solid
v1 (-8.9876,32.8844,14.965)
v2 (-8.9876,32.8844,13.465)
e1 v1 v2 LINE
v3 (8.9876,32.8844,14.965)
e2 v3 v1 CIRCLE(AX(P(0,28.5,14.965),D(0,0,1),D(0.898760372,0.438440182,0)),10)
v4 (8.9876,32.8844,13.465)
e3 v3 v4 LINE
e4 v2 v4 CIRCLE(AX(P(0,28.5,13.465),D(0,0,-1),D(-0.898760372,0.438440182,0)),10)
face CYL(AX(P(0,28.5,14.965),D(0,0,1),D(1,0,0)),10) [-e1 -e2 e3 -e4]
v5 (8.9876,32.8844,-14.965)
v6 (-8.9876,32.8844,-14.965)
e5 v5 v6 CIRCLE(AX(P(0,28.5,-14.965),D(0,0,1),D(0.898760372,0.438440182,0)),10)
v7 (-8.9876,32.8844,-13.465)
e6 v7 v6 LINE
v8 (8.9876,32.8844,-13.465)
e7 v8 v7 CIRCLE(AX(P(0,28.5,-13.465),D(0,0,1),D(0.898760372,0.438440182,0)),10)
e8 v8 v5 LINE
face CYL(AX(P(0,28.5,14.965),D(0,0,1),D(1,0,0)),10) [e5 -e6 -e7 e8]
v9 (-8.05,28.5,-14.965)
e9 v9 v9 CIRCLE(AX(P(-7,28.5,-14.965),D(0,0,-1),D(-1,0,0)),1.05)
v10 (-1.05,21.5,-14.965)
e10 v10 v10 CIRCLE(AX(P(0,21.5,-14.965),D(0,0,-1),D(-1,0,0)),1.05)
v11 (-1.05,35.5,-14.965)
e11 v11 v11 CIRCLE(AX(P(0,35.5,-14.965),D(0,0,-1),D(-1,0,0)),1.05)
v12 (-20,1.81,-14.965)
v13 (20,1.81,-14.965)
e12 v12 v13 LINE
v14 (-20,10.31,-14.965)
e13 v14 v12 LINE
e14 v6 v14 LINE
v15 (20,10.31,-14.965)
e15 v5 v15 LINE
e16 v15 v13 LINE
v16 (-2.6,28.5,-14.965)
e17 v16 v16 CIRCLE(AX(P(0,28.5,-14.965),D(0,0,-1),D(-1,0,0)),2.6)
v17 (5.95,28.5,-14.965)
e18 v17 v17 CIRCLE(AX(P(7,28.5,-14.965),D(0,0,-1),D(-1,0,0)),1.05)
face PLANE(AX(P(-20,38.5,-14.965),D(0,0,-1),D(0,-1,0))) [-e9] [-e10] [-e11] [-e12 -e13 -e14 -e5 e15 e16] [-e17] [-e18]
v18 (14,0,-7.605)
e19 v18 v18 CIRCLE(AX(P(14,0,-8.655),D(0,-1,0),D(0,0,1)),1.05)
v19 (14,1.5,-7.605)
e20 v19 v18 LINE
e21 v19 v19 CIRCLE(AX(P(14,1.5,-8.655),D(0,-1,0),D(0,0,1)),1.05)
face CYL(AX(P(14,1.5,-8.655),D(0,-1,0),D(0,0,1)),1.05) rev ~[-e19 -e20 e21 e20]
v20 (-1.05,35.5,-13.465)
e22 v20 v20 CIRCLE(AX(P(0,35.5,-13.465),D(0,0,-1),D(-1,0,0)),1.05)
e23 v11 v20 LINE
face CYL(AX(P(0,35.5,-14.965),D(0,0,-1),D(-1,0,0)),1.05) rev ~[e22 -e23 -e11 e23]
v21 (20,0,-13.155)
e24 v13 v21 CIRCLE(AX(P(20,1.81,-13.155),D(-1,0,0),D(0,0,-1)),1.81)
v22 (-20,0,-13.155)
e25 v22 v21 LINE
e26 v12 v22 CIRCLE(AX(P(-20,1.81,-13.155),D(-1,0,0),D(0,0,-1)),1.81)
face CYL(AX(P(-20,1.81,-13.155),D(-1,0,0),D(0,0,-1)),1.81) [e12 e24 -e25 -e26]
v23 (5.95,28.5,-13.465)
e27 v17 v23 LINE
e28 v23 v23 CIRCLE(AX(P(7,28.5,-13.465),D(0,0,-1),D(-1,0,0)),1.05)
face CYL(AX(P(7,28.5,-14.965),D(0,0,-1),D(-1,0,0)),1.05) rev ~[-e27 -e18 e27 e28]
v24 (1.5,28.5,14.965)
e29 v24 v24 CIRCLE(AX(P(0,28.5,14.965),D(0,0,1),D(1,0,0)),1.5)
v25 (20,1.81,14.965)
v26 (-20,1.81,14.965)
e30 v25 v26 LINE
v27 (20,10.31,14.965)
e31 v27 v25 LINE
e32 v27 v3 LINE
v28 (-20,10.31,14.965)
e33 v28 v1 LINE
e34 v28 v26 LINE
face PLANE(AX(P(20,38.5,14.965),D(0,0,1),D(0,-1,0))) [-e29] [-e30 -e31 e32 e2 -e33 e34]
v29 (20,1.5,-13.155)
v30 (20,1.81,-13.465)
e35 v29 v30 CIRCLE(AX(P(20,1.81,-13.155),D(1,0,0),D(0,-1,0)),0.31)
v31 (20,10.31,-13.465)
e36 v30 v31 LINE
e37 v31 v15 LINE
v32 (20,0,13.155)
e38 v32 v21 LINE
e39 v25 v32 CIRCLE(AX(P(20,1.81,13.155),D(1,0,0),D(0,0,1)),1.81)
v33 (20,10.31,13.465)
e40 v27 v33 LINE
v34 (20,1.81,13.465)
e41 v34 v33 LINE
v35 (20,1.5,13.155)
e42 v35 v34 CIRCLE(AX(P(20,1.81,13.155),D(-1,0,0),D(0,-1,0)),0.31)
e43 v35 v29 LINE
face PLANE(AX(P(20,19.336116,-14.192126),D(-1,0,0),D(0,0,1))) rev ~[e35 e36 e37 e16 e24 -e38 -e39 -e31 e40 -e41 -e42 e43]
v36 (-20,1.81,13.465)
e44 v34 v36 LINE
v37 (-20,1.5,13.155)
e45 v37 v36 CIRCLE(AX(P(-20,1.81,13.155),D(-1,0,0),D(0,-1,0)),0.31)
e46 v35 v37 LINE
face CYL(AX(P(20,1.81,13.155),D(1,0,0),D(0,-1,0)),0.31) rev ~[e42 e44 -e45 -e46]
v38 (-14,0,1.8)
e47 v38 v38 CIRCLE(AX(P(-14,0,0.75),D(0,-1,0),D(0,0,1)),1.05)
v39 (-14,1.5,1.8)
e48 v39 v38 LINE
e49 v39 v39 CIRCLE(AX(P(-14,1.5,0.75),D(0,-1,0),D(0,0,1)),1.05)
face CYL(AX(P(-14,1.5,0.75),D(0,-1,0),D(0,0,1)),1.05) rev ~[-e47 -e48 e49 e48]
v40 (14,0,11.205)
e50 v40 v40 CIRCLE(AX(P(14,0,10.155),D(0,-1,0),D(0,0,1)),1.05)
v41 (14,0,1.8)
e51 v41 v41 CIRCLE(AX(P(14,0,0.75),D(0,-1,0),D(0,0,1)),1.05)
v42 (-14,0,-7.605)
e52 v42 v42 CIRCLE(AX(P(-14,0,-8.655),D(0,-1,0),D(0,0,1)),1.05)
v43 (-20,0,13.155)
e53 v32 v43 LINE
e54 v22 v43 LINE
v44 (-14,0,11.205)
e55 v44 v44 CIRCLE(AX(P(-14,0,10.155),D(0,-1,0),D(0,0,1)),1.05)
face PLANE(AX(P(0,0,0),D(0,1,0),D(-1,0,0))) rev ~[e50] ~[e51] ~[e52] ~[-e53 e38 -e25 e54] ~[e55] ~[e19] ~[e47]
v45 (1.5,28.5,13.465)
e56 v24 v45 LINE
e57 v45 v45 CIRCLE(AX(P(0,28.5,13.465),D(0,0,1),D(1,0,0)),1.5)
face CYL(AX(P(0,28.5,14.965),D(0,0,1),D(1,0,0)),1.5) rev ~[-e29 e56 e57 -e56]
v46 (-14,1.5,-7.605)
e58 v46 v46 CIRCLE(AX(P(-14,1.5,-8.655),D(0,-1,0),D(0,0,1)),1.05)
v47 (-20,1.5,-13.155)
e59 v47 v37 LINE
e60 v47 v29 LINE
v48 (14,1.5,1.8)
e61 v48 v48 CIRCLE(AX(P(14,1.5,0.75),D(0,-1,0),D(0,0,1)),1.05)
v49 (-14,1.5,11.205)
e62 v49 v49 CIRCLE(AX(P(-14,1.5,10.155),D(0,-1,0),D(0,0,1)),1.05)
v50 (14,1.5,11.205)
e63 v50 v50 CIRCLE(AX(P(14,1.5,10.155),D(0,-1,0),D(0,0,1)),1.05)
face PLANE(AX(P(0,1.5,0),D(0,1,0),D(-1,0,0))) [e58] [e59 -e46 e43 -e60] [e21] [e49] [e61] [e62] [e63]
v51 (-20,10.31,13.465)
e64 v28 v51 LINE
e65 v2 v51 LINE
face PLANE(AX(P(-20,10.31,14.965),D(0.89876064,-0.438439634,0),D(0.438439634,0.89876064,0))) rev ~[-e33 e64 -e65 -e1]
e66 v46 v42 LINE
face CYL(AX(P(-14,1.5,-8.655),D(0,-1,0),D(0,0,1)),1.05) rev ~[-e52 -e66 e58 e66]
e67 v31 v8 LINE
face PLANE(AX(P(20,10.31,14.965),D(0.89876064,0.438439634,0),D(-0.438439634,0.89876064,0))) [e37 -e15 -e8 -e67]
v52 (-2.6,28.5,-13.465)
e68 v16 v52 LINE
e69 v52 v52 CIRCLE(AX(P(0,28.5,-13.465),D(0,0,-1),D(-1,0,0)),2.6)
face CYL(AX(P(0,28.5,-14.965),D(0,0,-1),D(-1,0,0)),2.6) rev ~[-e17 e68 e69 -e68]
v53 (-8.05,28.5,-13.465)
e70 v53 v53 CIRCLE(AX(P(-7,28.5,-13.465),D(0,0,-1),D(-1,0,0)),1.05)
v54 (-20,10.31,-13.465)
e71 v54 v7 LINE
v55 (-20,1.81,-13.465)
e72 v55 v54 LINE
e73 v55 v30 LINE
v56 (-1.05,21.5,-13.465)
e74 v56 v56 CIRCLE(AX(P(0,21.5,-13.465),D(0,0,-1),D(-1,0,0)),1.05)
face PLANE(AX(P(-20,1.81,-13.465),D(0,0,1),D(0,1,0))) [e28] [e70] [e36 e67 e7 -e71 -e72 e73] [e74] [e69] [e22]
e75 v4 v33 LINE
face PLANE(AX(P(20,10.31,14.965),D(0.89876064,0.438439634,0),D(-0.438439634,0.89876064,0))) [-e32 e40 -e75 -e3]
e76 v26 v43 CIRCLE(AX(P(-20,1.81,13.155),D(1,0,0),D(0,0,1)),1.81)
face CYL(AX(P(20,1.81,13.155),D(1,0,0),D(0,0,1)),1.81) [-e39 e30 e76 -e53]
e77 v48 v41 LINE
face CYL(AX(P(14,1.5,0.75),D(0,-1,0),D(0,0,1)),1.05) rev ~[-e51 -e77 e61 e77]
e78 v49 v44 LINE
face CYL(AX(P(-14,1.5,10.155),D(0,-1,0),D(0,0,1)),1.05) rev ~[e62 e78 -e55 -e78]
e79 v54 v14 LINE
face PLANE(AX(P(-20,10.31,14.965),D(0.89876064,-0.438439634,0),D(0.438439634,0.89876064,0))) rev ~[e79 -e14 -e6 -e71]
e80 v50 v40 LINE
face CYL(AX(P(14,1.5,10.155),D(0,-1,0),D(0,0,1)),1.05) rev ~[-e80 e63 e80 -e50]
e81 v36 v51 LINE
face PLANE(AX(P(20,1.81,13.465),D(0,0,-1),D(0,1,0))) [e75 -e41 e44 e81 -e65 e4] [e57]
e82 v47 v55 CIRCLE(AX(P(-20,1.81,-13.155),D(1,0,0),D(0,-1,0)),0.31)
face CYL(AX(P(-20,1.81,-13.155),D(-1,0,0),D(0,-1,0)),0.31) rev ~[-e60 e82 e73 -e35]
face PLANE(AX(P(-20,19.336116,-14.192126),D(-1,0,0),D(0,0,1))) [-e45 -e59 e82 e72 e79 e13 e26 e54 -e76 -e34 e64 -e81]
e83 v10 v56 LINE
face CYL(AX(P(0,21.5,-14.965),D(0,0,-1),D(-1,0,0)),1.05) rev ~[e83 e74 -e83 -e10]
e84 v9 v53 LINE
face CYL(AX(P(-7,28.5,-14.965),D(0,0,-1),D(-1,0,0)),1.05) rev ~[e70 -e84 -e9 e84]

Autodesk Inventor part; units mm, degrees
ref_plane "YZ Plane" through (0, 0, 0) normal (1, 0, 0) x (0, 1, 0)
ref_plane "XZ Plane" through (0, 0, 0) normal (0, 1, 0) x (-1, 0, 0)
ref_plane "XY Plane" through (0, 0, 0) normal (0, 0, 1) x (1, 0, 0)
sketch "Sketch1" plane through (0, 0, 0) normal (0, 1, 0) x (-1, 0, 0)
  line L0 (20, 14.965) -> (-20, 14.965)
  line L1 (-20, 14.965) -> (-20, -14.965)
  line L2 (-20, -14.965) -> (20, -14.965)
  line L3 (20, -14.965) -> (20, 14.965)
  point P0 (0, 0)
  dimension "d0" = 29.93
  dimension "d1" = 40
  dimension "d2" = 20
  dimension "d3" = 14.965
extrude "Plate1" add sketch "Sketch1" along normal blind 1.5
sketch "Sketch2" plane through (-20, 0, -13.465) normal (0, 0, -1) x (-1, 0, 0)
  line L0 (-40, 0) -> (0, 0)
  line L1 (0, 0) -> (0, 38.5)
  line L2 (0, 38.5) -> (-40, 38.5)
  line L3 (-40, 38.5) -> (-40, 0)
edge flange "Flange1" height 38.5 angle 90 thickness 1.5 bend radius 0.31 thickness toward (0, 0, -1) relief tear relief width 1.5 relief depth 0.75 corner gap 0.31 corner form 0 edges at (0, 1.5, -14.965) (0, 1.5, 14.965) wall of the first edge with corners at (20, 0, -13.465) (-20, 0, -13.465) (-20, 38.5, -13.465) (20, 38.5, -13.465)
bend "Bend1"
corner "Corner1"
sketch "Sketch3" plane through (-20, 38.5, 14.965) normal (0, 0, 1) x (1, 0, 0)
  line L0 (0, 0) -> (40, 0) projected
  line L1 (0, -36.69) -> (0, 0) projected
  circle A0 centre (20, -10) radius 10
  line L2 (0, -28.19) -> (40, -28.19)
  line L3 (40, -28.19) -> (40, -38.19)
  line L4 (40, -38.19) -> (0, -38.19)
  line L5 (0, -38.19) -> (0, -28.19)
  line L6 (40, -28.19) -> (28.9876, -5.6156)
  line L7 (0, -28.19) -> (11.0124, -5.6156)
  line L8 (0, 0) -> (40, 0)
  line L9 (40, 0) -> (40, -35)
  line L10 (40, -35) -> (0, -35)
  line L11 (0, -35) -> (0, 0)
  point P0 (20, -38.5)
  point P1 (20, 0)
  point P2 (0, -28.19)
  point P3 (0, -35)
  point P4 (30, -10)
  dimension "d15" = 10
  dimension "d16" = 0
  dimension "d17" = 20
  dimension "d18" = 18.19
  dimension "d19" = 0
  dimension "d20" = 40
  dimension "d21" = 10
  dimension "d22" = 35
extrude "Extrusion1" cut sketch "Sketch3" against normal blind 35 contours L0 A0 L7 L1 | L0 L9 L6 A0
sketch "Sketch4" plane through (20, 1.81, -14.965) normal (0, 0, -1) x (-1, 0, 0)
  arc A0 (28.9876, 31.0744) -> (11.0124, 31.0744) centre (20, 26.69) ccw projected
  circle A1 centre (20, 26.69) radius 2.6
  circle A2 centre (13, 26.69) radius 1.05
  circle A3 centre (27, 26.69) radius 1.05
  circle A4 centre (20, 33.69) radius 1.05
  circle A5 centre (20, 19.69) radius 1.05
  point P0 (20, -1.81)
  dimension "d25" = 5.2
  dimension "d26" = 0
  dimension "d27" = 7
  dimension "d28" = 2.1
  dimension "d29" = 7
  dimension "d30" = 0
  dimension "d31" = 2.1
  dimension "d32" = 0
  dimension "d33" = 7
  dimension "d34" = 2.1
  dimension "d35" = 7
  dimension "d36" = 0
  dimension "d37" = 2.1
extrude "Extrusion2" cut sketch "Sketch4" against normal blind 1.5
sketch "Sketch5" plane through (-20, 1.81, 14.965) normal (0, 0, 1) x (1, 0, 0)
  arc A0 (28.9876, 31.0744) -> (11.0124, 31.0744) centre (20, 26.69) ccw projected
  circle A1 centre (20, 26.69) radius 1.5
  point P0 (20, -1.81)
  dimension "d40" = 3
extrude "Extrusion3" cut sketch "Sketch5" against normal blind 1.5
sketch "Sketch6" plane through (0, 1.5, 0) normal (0, 1, 0) x (1, 0, 0)
  circle A0 centre (-14, -10.155) radius 1.05 projected
  circle A1 centre (-14, -0.75) radius 1.05 projected
  circle A2 centre (-14, 8.655) radius 1.05 projected
  circle A3 centre (14, -10.155) radius 1.05 projected
  circle A4 centre (14, -0.75) radius 1.05 projected
  circle A5 centre (14, 8.655) radius 1.05 projected
  point P0 (0, 0)
hole "Hole1" at (14, 1.5, -8.655) at (14, 1.5, 0.75) at (14, 1.5, 10.155) at (-14, 1.5, 10.155) at (-14, 1.5, 0.75) at (-14, 1.5, -8.655) direction (0, -1, 0) diameter 2.1 depth 1.5
equation "\"d48\" = Thickness"
equation "\"d4\" = Thickness"
equation "\"d5\" = BendReliefWidth"
equation "\"d6\" = BendReliefDepth"
equation "\"d7\" = MinimumRemnant"
equation "\"d8\" = TransitionRadius"
equation "\"d11\" = BendRadius"
equation "\"d12\" = CornerReliefSize"
equation "\"d13\" = GapSize"
equation "\"d14\" = JacobiRadiusSize"
equation "\"BendReliefWidth\" = Thickness"
equation "\"BendReliefDepth\" = 0.5 * Thickness"
equation "\"CornerReliefSize\" = 4 * Thickness"
equation "\"MinimumRemnant\" = 2 * Thickness"
equation "\"TransitionRadius\" = BendRadius"
equation "\"JacobiRadiusSize\" = BendRadius"
equation "\"GapSize\" = Thickness"
equation "\"Thickness\" = 1.5"
equation "\"BendRadius\" = 0.31"
properties part number "partpart" material "Aluminum 6061-AHC"
